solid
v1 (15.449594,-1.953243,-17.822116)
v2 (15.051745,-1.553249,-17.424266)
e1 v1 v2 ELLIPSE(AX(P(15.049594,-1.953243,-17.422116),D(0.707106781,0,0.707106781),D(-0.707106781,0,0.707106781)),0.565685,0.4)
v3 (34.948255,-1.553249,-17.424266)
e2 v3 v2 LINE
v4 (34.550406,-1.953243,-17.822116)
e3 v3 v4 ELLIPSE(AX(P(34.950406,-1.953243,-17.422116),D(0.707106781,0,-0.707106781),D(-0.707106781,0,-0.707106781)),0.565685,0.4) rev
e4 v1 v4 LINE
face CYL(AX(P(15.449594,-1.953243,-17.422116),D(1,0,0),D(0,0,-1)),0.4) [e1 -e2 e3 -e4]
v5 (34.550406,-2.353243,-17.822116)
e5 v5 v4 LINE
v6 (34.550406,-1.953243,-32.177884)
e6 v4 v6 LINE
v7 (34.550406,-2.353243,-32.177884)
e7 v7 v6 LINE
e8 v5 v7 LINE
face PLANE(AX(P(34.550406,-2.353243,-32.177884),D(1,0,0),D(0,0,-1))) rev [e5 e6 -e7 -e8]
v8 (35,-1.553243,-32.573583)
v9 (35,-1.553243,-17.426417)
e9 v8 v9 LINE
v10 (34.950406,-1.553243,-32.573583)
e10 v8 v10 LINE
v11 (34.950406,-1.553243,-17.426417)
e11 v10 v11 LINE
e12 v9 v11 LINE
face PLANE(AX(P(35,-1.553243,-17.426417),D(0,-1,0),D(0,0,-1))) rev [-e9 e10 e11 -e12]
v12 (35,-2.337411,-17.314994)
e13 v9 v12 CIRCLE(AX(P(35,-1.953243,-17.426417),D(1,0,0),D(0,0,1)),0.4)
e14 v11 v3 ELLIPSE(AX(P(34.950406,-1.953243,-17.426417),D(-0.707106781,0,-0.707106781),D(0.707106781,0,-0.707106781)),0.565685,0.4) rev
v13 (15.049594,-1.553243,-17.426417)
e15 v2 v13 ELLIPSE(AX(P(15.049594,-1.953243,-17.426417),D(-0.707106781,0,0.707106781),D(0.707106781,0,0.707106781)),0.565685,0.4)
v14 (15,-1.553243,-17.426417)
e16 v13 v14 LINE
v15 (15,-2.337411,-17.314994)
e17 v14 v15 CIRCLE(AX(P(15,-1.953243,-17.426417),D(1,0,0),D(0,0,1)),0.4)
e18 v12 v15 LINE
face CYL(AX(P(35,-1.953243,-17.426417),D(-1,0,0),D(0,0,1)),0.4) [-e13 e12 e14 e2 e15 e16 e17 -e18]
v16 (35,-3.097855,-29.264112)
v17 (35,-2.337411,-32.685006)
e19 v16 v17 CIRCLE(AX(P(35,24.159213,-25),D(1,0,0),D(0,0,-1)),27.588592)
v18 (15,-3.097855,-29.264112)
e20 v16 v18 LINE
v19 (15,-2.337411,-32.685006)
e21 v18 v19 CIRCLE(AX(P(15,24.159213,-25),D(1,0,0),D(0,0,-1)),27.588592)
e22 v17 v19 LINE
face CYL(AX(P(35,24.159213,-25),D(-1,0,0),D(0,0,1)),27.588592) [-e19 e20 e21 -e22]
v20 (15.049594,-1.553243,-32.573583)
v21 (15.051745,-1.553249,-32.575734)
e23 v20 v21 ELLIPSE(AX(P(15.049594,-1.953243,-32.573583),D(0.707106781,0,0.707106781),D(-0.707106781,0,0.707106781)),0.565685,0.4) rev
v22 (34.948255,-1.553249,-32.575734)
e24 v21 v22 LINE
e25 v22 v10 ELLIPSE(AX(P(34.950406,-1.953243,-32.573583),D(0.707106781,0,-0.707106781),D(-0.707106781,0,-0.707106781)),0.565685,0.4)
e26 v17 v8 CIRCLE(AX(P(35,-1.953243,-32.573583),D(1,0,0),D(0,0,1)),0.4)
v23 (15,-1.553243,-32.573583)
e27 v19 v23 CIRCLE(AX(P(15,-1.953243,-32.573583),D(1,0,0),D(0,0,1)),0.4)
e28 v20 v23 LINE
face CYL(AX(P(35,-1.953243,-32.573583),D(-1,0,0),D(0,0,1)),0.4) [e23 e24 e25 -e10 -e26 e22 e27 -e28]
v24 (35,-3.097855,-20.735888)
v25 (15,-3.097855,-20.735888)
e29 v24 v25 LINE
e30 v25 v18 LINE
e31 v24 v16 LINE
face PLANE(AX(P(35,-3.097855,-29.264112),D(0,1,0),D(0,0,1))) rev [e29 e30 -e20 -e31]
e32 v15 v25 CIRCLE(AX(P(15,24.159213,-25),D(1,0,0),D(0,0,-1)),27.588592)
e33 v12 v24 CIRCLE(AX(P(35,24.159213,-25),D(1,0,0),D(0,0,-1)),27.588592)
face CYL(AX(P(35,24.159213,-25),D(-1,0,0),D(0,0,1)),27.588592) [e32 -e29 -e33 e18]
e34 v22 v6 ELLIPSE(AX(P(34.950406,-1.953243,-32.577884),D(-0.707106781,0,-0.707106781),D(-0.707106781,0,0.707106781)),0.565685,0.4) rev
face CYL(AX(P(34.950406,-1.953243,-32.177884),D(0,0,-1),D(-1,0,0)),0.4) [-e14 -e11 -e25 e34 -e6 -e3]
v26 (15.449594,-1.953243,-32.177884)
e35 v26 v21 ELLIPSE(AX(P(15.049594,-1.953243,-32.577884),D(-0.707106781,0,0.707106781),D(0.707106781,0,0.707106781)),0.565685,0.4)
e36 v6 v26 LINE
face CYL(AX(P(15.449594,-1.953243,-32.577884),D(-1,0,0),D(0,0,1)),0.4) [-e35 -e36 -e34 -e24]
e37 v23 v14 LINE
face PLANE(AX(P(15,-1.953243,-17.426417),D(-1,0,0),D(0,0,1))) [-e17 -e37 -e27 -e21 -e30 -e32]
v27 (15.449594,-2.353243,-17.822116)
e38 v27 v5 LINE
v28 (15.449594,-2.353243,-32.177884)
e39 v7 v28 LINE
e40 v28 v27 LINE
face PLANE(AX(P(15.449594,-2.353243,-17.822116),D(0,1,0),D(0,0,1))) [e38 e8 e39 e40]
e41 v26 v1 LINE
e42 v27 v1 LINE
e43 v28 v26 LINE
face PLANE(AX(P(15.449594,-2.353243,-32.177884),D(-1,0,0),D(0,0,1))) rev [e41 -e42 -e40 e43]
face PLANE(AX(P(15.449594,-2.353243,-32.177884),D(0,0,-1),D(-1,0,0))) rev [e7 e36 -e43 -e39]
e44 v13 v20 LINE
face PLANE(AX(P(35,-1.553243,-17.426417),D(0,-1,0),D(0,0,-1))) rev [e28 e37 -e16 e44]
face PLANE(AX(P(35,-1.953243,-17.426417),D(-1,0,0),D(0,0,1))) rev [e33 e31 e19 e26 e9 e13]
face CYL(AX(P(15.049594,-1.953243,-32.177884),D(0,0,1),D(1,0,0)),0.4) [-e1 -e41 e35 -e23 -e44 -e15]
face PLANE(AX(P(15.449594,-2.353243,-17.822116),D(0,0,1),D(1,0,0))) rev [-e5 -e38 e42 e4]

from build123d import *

# Parameters (mm, degrees)
EXTRUDE_1_DEPTH     = 50
SKETCH_2_W          = 47.752029062465894
SKETCH_2_H          = 35.88941973747437
CUT_EXTRUDE_1_DEPTH = 2
FILLET_1_R          = 1
SCALE_1_SCALE       = 0.4


with BuildPart() as part:
    # 草图1 → 凸台-拉伸1 (new body)
    with BuildSketch(Plane(origin=(0, 0, 0), x_dir=(0, 0, -1), z_dir=(1, 0, 0))):
        with BuildLine():
            Line((6.066042211617314, 0), (43.933957788382685, 0))
            ThreePointArc((43.933957788382685, 0), (44.92401323811772, -0.85932233137432), (44.212515173340435, -1.9604195871000956))
            ThreePointArc((44.212515173340435, -1.9604195871000956), (39.96661362209007, -3.046903416934029), (35.66027972203156, -3.861529365825664))
            Line((35.66027972203156, -3.861529365825664), (14.339720277968421, -3.861529365825664))
            ThreePointArc((14.339720277968421, -3.861529365825664), (10.03338637790992, -3.046903416934029), (5.787484826659573, -1.9604195871000956))
            ThreePointArc((5.787484826659573, -1.9604195871000956), (5.075986761882271, -0.8593223313743236), (6.066042211617314, 0))
        make_face()
    extrude(amount=EXTRUDE_1_DEPTH)

    # 草图2 → 切除-拉伸1 (cut)
    with BuildSketch(Plane(origin=(0, 0, 0), x_dir=(1, 0, 0), z_dir=(0, 1, 0))):
        with Locations((25, 25.000000000000007)):
            Rectangle(SKETCH_2_W, SKETCH_2_H)
    extrude(amount=-CUT_EXTRUDE_1_DEPTH, mode=Mode.SUBTRACT)

    # 圆角1
    # the kernel refuses this fillet: 1 mm, written as the material it takes off along each edge
    with BuildSketch(Plane(origin=(1.1239854687670539, 0, -7.055290131262825), x_dir=(-1, 0, 0), z_dir=(0, 0, -1))) as fillet_1_piece_1:
        with BuildLine():
            CenterArc((FILLET_1_R, -FILLET_1_R), FILLET_1_R, 90, 90)
            Line((0, -FILLET_1_R), (-FILLET_1_R * 0.02, -FILLET_1_R))
            Line((-FILLET_1_R * 0.02, -FILLET_1_R), (-FILLET_1_R * 0.02, FILLET_1_R * 0.02))
            Line((-FILLET_1_R * 0.02, FILLET_1_R * 0.02), (FILLET_1_R, FILLET_1_R * 0.02))
            Line((FILLET_1_R, FILLET_1_R * 0.02), (FILLET_1_R, 0))
        make_face()
    extrude(amount=35.88941973747437, mode=Mode.SUBTRACT)
    with BuildSketch(Plane(origin=(48.87601453123295, 0, -7.055290131262825), x_dir=(0, 0, 1), z_dir=(-1, 0, 0))) as fillet_1_piece_2:
        with BuildLine():
            CenterArc((FILLET_1_R, -FILLET_1_R), FILLET_1_R, 90, 90)
            Line((0, -FILLET_1_R), (-FILLET_1_R * 0.02, -FILLET_1_R))
            Line((-FILLET_1_R * 0.02, -FILLET_1_R), (-FILLET_1_R * 0.02, FILLET_1_R * 0.02))
            Line((-FILLET_1_R * 0.02, FILLET_1_R * 0.02), (FILLET_1_R, FILLET_1_R * 0.02))
            Line((FILLET_1_R, FILLET_1_R * 0.02), (FILLET_1_R, 0))
        make_face()
    extrude(amount=47.752029062465894, mode=Mode.SUBTRACT)
    with BuildSketch(Plane(origin=(48.87601453123295, 0, -42.94470986873719), x_dir=(1, 0, 0), z_dir=(0, 0, 1))) as fillet_1_piece_3:
        with BuildLine():
            CenterArc((FILLET_1_R, -FILLET_1_R), FILLET_1_R, 90, 90)
            Line((0, -FILLET_1_R), (-FILLET_1_R * 0.02, -FILLET_1_R))
            Line((-FILLET_1_R * 0.02, -FILLET_1_R), (-FILLET_1_R * 0.02, FILLET_1_R * 0.02))
            Line((-FILLET_1_R * 0.02, FILLET_1_R * 0.02), (FILLET_1_R, FILLET_1_R * 0.02))
            Line((FILLET_1_R, FILLET_1_R * 0.02), (FILLET_1_R, 0))
        make_face()
    extrude(amount=35.88941973747437, mode=Mode.SUBTRACT)
    with BuildSketch(Plane(origin=(1.1239854687670539, 0, -42.94470986873719), x_dir=(0, 0, -1), z_dir=(1, 0, 0))) as fillet_1_piece_4:
        with BuildLine():
            CenterArc((FILLET_1_R, -FILLET_1_R), FILLET_1_R, 90, 90)
            Line((0, -FILLET_1_R), (-FILLET_1_R * 0.02, -FILLET_1_R))
            Line((-FILLET_1_R * 0.02, -FILLET_1_R), (-FILLET_1_R * 0.02, FILLET_1_R * 0.02))
            Line((-FILLET_1_R * 0.02, FILLET_1_R * 0.02), (FILLET_1_R, FILLET_1_R * 0.02))
            Line((FILLET_1_R, FILLET_1_R * 0.02), (FILLET_1_R, 0))
        make_face()
    extrude(amount=47.752029062465894, mode=Mode.SUBTRACT)
    with BuildSketch(Plane(origin=(1.1239854687670539, 0, -4.555290131262826), x_dir=(-1, 0, 0), z_dir=(0, 0, -1))) as fillet_1_piece_5a_section:
        with BuildLine():
            CenterArc((FILLET_1_R, -FILLET_1_R), FILLET_1_R, 90, 90)
            Line((0, -FILLET_1_R), (-FILLET_1_R * 0.02, -FILLET_1_R))
            Line((-FILLET_1_R * 0.02, -FILLET_1_R), (-FILLET_1_R * 0.02, FILLET_1_R * 0.02))
            Line((-FILLET_1_R * 0.02, FILLET_1_R * 0.02), (FILLET_1_R, FILLET_1_R * 0.02))
            Line((FILLET_1_R, FILLET_1_R * 0.02), (FILLET_1_R, 0))
        make_face()
    fillet_1_piece_5a = extrude(amount=38.38941973747437, mode=Mode.PRIVATE)
    fillet_1_piece_5a = split(fillet_1_piece_5a, bisect_by=Plane(origin=(0.8975903545002311, -0.2263951142668261, -7.055290131262825), z_dir=(0, 0, 1)), keep=Keep.TOP, mode=Mode.PRIVATE)
    with BuildSketch(Plane(origin=(48.87601453123295, 0, -7.055290131262825), x_dir=(0, 0, 1), z_dir=(-1, 0, 0))) as fillet_1_piece_5b_section:
        with BuildLine():
            CenterArc((FILLET_1_R, -FILLET_1_R), FILLET_1_R, 90, 90)
            Line((0, -FILLET_1_R), (-FILLET_1_R * 0.02, -FILLET_1_R))
            Line((-FILLET_1_R * 0.02, -FILLET_1_R), (-FILLET_1_R * 0.02, FILLET_1_R * 0.02))
            Line((-FILLET_1_R * 0.02, FILLET_1_R * 0.02), (FILLET_1_R, FILLET_1_R * 0.02))
            Line((FILLET_1_R, FILLET_1_R * 0.02), (FILLET_1_R, 0))
        make_face()
    fillet_1_piece_5b = extrude(amount=50.252029062465894, mode=Mode.PRIVATE)
    fillet_1_piece_5b = split(fillet_1_piece_5b, bisect_by=Plane(origin=(1.1239854687670539, -0.22639511426682482, -6.828895016995999), z_dir=(-1, 0, 0)), keep=Keep.TOP, mode=Mode.PRIVATE)
    fillet_1_piece_5 = fillet_1_piece_5a & fillet_1_piece_5b
    add(fillet_1_piece_5, mode=Mode.SUBTRACT)
    with BuildSketch(Plane(origin=(1.1239854687670539, 0, -7.055290131262825), x_dir=(-1, 0, 0), z_dir=(0, 0, -1))) as fillet_1_piece_6a_section:
        with BuildLine():
            CenterArc((FILLET_1_R, -FILLET_1_R), FILLET_1_R, 90, 90)
            Line((0, -FILLET_1_R), (-FILLET_1_R * 0.02, -FILLET_1_R))
            Line((-FILLET_1_R * 0.02, -FILLET_1_R), (-FILLET_1_R * 0.02, FILLET_1_R * 0.02))
            Line((-FILLET_1_R * 0.02, FILLET_1_R * 0.02), (FILLET_1_R, FILLET_1_R * 0.02))
            Line((FILLET_1_R, FILLET_1_R * 0.02), (FILLET_1_R, 0))
        make_face()
    fillet_1_piece_6a = extrude(amount=38.38941973747437, mode=Mode.PRIVATE)
    fillet_1_piece_6a = split(fillet_1_piece_6a, bisect_by=Plane(origin=(0.8975903545002285, -0.22639511426682538, -42.94470986873719), z_dir=(0, 0, -1)), keep=Keep.TOP, mode=Mode.PRIVATE)
    with BuildSketch(Plane(origin=(-1.3760145312329461, 0, -42.94470986873719), x_dir=(0, 0, -1), z_dir=(1, 0, 0))) as fillet_1_piece_6b_section:
        with BuildLine():
            CenterArc((FILLET_1_R, -FILLET_1_R), FILLET_1_R, 90, 90)
            Line((0, -FILLET_1_R), (-FILLET_1_R * 0.02, -FILLET_1_R))
            Line((-FILLET_1_R * 0.02, -FILLET_1_R), (-FILLET_1_R * 0.02, FILLET_1_R * 0.02))
            Line((-FILLET_1_R * 0.02, FILLET_1_R * 0.02), (FILLET_1_R, FILLET_1_R * 0.02))
            Line((FILLET_1_R, FILLET_1_R * 0.02), (FILLET_1_R, 0))
        make_face()
    fillet_1_piece_6b = extrude(amount=50.252029062465894, mode=Mode.PRIVATE)
    fillet_1_piece_6b = split(fillet_1_piece_6b, bisect_by=Plane(origin=(1.1239854687670539, -0.22639511426682907, -43.171104983004014), z_dir=(-1, 0, 0)), keep=Keep.TOP, mode=Mode.PRIVATE)
    fillet_1_piece_6 = fillet_1_piece_6a & fillet_1_piece_6b
    add(fillet_1_piece_6, mode=Mode.SUBTRACT)
    with BuildSketch(Plane(origin=(51.37601453123295, 0, -7.055290131262825), x_dir=(0, 0, 1), z_dir=(-1, 0, 0))) as fillet_1_piece_7a_section:
        with BuildLine():
            CenterArc((FILLET_1_R, -FILLET_1_R), FILLET_1_R, 90, 90)
            Line((0, -FILLET_1_R), (-FILLET_1_R * 0.02, -FILLET_1_R))
            Line((-FILLET_1_R * 0.02, -FILLET_1_R), (-FILLET_1_R * 0.02, FILLET_1_R * 0.02))
            Line((-FILLET_1_R * 0.02, FILLET_1_R * 0.02), (FILLET_1_R, FILLET_1_R * 0.02))
            Line((FILLET_1_R, FILLET_1_R * 0.02), (FILLET_1_R, 0))
        make_face()
    fillet_1_piece_7a = extrude(amount=50.252029062465894, mode=Mode.PRIVATE)
    fillet_1_piece_7a = split(fillet_1_piece_7a, bisect_by=Plane(origin=(48.87601453123295, -0.22639511426682557, -6.828895016996), z_dir=(1, 0, 0)), keep=Keep.TOP, mode=Mode.PRIVATE)
    with BuildSketch(Plane(origin=(48.87601453123295, 0, -42.94470986873719), x_dir=(1, 0, 0), z_dir=(0, 0, 1))) as fillet_1_piece_7b_section:
        with BuildLine():
            CenterArc((FILLET_1_R, -FILLET_1_R), FILLET_1_R, 90, 90)
            Line((0, -FILLET_1_R), (-FILLET_1_R * 0.02, -FILLET_1_R))
            Line((-FILLET_1_R * 0.02, -FILLET_1_R), (-FILLET_1_R * 0.02, FILLET_1_R * 0.02))
            Line((-FILLET_1_R * 0.02, FILLET_1_R * 0.02), (FILLET_1_R, FILLET_1_R * 0.02))
            Line((FILLET_1_R, FILLET_1_R * 0.02), (FILLET_1_R, 0))
        make_face()
    fillet_1_piece_7b = extrude(amount=38.38941973747437, mode=Mode.PRIVATE)
    fillet_1_piece_7b = split(fillet_1_piece_7b, bisect_by=Plane(origin=(49.10240964549977, -0.22639511426682904, -7.055290131262825), z_dir=(0, 0, 1)), keep=Keep.TOP, mode=Mode.PRIVATE)
    fillet_1_piece_7 = fillet_1_piece_7a & fillet_1_piece_7b
    add(fillet_1_piece_7, mode=Mode.SUBTRACT)
    with BuildSketch(Plane(origin=(48.87601453123295, 0, -45.44470986873719), x_dir=(1, 0, 0), z_dir=(0, 0, 1))) as fillet_1_piece_8a_section:
        with BuildLine():
            CenterArc((FILLET_1_R, -FILLET_1_R), FILLET_1_R, 90, 90)
            Line((0, -FILLET_1_R), (-FILLET_1_R * 0.02, -FILLET_1_R))
            Line((-FILLET_1_R * 0.02, -FILLET_1_R), (-FILLET_1_R * 0.02, FILLET_1_R * 0.02))
            Line((-FILLET_1_R * 0.02, FILLET_1_R * 0.02), (FILLET_1_R, FILLET_1_R * 0.02))
            Line((FILLET_1_R, FILLET_1_R * 0.02), (FILLET_1_R, 0))
        make_face()
    fillet_1_piece_8a = extrude(amount=38.38941973747437, mode=Mode.PRIVATE)
    fillet_1_piece_8a = split(fillet_1_piece_8a, bisect_by=Plane(origin=(49.10240964549977, -0.2263951142668292, -42.94470986873719), z_dir=(0, 0, -1)), keep=Keep.TOP, mode=Mode.PRIVATE)
    with BuildSketch(Plane(origin=(1.1239854687670539, 0, -42.94470986873719), x_dir=(0, 0, -1), z_dir=(1, 0, 0))) as fillet_1_piece_8b_section:
        with BuildLine():
            CenterArc((FILLET_1_R, -FILLET_1_R), FILLET_1_R, 90, 90)
            Line((0, -FILLET_1_R), (-FILLET_1_R * 0.02, -FILLET_1_R))
            Line((-FILLET_1_R * 0.02, -FILLET_1_R), (-FILLET_1_R * 0.02, FILLET_1_R * 0.02))
            Line((-FILLET_1_R * 0.02, FILLET_1_R * 0.02), (FILLET_1_R, FILLET_1_R * 0.02))
            Line((FILLET_1_R, FILLET_1_R * 0.02), (FILLET_1_R, 0))
        make_face()
    fillet_1_piece_8b = extrude(amount=50.252029062465894, mode=Mode.PRIVATE)
    fillet_1_piece_8b = split(fillet_1_piece_8b, bisect_by=Plane(origin=(48.87601453123295, -0.22639511426682885, -43.17110498300402), z_dir=(1, 0, 0)), keep=Keep.TOP, mode=Mode.PRIVATE)
    fillet_1_piece_8 = fillet_1_piece_8a & fillet_1_piece_8b
    add(fillet_1_piece_8, mode=Mode.SUBTRACT)


with BuildPart() as part_1:
    # 缩放比例1: scaled about (25, -2.588659759, -25)
    add(part.part.scale(SCALE_1_SCALE).moved(Location((15, -1.5531958554, -15))))


solid = part_1.part
